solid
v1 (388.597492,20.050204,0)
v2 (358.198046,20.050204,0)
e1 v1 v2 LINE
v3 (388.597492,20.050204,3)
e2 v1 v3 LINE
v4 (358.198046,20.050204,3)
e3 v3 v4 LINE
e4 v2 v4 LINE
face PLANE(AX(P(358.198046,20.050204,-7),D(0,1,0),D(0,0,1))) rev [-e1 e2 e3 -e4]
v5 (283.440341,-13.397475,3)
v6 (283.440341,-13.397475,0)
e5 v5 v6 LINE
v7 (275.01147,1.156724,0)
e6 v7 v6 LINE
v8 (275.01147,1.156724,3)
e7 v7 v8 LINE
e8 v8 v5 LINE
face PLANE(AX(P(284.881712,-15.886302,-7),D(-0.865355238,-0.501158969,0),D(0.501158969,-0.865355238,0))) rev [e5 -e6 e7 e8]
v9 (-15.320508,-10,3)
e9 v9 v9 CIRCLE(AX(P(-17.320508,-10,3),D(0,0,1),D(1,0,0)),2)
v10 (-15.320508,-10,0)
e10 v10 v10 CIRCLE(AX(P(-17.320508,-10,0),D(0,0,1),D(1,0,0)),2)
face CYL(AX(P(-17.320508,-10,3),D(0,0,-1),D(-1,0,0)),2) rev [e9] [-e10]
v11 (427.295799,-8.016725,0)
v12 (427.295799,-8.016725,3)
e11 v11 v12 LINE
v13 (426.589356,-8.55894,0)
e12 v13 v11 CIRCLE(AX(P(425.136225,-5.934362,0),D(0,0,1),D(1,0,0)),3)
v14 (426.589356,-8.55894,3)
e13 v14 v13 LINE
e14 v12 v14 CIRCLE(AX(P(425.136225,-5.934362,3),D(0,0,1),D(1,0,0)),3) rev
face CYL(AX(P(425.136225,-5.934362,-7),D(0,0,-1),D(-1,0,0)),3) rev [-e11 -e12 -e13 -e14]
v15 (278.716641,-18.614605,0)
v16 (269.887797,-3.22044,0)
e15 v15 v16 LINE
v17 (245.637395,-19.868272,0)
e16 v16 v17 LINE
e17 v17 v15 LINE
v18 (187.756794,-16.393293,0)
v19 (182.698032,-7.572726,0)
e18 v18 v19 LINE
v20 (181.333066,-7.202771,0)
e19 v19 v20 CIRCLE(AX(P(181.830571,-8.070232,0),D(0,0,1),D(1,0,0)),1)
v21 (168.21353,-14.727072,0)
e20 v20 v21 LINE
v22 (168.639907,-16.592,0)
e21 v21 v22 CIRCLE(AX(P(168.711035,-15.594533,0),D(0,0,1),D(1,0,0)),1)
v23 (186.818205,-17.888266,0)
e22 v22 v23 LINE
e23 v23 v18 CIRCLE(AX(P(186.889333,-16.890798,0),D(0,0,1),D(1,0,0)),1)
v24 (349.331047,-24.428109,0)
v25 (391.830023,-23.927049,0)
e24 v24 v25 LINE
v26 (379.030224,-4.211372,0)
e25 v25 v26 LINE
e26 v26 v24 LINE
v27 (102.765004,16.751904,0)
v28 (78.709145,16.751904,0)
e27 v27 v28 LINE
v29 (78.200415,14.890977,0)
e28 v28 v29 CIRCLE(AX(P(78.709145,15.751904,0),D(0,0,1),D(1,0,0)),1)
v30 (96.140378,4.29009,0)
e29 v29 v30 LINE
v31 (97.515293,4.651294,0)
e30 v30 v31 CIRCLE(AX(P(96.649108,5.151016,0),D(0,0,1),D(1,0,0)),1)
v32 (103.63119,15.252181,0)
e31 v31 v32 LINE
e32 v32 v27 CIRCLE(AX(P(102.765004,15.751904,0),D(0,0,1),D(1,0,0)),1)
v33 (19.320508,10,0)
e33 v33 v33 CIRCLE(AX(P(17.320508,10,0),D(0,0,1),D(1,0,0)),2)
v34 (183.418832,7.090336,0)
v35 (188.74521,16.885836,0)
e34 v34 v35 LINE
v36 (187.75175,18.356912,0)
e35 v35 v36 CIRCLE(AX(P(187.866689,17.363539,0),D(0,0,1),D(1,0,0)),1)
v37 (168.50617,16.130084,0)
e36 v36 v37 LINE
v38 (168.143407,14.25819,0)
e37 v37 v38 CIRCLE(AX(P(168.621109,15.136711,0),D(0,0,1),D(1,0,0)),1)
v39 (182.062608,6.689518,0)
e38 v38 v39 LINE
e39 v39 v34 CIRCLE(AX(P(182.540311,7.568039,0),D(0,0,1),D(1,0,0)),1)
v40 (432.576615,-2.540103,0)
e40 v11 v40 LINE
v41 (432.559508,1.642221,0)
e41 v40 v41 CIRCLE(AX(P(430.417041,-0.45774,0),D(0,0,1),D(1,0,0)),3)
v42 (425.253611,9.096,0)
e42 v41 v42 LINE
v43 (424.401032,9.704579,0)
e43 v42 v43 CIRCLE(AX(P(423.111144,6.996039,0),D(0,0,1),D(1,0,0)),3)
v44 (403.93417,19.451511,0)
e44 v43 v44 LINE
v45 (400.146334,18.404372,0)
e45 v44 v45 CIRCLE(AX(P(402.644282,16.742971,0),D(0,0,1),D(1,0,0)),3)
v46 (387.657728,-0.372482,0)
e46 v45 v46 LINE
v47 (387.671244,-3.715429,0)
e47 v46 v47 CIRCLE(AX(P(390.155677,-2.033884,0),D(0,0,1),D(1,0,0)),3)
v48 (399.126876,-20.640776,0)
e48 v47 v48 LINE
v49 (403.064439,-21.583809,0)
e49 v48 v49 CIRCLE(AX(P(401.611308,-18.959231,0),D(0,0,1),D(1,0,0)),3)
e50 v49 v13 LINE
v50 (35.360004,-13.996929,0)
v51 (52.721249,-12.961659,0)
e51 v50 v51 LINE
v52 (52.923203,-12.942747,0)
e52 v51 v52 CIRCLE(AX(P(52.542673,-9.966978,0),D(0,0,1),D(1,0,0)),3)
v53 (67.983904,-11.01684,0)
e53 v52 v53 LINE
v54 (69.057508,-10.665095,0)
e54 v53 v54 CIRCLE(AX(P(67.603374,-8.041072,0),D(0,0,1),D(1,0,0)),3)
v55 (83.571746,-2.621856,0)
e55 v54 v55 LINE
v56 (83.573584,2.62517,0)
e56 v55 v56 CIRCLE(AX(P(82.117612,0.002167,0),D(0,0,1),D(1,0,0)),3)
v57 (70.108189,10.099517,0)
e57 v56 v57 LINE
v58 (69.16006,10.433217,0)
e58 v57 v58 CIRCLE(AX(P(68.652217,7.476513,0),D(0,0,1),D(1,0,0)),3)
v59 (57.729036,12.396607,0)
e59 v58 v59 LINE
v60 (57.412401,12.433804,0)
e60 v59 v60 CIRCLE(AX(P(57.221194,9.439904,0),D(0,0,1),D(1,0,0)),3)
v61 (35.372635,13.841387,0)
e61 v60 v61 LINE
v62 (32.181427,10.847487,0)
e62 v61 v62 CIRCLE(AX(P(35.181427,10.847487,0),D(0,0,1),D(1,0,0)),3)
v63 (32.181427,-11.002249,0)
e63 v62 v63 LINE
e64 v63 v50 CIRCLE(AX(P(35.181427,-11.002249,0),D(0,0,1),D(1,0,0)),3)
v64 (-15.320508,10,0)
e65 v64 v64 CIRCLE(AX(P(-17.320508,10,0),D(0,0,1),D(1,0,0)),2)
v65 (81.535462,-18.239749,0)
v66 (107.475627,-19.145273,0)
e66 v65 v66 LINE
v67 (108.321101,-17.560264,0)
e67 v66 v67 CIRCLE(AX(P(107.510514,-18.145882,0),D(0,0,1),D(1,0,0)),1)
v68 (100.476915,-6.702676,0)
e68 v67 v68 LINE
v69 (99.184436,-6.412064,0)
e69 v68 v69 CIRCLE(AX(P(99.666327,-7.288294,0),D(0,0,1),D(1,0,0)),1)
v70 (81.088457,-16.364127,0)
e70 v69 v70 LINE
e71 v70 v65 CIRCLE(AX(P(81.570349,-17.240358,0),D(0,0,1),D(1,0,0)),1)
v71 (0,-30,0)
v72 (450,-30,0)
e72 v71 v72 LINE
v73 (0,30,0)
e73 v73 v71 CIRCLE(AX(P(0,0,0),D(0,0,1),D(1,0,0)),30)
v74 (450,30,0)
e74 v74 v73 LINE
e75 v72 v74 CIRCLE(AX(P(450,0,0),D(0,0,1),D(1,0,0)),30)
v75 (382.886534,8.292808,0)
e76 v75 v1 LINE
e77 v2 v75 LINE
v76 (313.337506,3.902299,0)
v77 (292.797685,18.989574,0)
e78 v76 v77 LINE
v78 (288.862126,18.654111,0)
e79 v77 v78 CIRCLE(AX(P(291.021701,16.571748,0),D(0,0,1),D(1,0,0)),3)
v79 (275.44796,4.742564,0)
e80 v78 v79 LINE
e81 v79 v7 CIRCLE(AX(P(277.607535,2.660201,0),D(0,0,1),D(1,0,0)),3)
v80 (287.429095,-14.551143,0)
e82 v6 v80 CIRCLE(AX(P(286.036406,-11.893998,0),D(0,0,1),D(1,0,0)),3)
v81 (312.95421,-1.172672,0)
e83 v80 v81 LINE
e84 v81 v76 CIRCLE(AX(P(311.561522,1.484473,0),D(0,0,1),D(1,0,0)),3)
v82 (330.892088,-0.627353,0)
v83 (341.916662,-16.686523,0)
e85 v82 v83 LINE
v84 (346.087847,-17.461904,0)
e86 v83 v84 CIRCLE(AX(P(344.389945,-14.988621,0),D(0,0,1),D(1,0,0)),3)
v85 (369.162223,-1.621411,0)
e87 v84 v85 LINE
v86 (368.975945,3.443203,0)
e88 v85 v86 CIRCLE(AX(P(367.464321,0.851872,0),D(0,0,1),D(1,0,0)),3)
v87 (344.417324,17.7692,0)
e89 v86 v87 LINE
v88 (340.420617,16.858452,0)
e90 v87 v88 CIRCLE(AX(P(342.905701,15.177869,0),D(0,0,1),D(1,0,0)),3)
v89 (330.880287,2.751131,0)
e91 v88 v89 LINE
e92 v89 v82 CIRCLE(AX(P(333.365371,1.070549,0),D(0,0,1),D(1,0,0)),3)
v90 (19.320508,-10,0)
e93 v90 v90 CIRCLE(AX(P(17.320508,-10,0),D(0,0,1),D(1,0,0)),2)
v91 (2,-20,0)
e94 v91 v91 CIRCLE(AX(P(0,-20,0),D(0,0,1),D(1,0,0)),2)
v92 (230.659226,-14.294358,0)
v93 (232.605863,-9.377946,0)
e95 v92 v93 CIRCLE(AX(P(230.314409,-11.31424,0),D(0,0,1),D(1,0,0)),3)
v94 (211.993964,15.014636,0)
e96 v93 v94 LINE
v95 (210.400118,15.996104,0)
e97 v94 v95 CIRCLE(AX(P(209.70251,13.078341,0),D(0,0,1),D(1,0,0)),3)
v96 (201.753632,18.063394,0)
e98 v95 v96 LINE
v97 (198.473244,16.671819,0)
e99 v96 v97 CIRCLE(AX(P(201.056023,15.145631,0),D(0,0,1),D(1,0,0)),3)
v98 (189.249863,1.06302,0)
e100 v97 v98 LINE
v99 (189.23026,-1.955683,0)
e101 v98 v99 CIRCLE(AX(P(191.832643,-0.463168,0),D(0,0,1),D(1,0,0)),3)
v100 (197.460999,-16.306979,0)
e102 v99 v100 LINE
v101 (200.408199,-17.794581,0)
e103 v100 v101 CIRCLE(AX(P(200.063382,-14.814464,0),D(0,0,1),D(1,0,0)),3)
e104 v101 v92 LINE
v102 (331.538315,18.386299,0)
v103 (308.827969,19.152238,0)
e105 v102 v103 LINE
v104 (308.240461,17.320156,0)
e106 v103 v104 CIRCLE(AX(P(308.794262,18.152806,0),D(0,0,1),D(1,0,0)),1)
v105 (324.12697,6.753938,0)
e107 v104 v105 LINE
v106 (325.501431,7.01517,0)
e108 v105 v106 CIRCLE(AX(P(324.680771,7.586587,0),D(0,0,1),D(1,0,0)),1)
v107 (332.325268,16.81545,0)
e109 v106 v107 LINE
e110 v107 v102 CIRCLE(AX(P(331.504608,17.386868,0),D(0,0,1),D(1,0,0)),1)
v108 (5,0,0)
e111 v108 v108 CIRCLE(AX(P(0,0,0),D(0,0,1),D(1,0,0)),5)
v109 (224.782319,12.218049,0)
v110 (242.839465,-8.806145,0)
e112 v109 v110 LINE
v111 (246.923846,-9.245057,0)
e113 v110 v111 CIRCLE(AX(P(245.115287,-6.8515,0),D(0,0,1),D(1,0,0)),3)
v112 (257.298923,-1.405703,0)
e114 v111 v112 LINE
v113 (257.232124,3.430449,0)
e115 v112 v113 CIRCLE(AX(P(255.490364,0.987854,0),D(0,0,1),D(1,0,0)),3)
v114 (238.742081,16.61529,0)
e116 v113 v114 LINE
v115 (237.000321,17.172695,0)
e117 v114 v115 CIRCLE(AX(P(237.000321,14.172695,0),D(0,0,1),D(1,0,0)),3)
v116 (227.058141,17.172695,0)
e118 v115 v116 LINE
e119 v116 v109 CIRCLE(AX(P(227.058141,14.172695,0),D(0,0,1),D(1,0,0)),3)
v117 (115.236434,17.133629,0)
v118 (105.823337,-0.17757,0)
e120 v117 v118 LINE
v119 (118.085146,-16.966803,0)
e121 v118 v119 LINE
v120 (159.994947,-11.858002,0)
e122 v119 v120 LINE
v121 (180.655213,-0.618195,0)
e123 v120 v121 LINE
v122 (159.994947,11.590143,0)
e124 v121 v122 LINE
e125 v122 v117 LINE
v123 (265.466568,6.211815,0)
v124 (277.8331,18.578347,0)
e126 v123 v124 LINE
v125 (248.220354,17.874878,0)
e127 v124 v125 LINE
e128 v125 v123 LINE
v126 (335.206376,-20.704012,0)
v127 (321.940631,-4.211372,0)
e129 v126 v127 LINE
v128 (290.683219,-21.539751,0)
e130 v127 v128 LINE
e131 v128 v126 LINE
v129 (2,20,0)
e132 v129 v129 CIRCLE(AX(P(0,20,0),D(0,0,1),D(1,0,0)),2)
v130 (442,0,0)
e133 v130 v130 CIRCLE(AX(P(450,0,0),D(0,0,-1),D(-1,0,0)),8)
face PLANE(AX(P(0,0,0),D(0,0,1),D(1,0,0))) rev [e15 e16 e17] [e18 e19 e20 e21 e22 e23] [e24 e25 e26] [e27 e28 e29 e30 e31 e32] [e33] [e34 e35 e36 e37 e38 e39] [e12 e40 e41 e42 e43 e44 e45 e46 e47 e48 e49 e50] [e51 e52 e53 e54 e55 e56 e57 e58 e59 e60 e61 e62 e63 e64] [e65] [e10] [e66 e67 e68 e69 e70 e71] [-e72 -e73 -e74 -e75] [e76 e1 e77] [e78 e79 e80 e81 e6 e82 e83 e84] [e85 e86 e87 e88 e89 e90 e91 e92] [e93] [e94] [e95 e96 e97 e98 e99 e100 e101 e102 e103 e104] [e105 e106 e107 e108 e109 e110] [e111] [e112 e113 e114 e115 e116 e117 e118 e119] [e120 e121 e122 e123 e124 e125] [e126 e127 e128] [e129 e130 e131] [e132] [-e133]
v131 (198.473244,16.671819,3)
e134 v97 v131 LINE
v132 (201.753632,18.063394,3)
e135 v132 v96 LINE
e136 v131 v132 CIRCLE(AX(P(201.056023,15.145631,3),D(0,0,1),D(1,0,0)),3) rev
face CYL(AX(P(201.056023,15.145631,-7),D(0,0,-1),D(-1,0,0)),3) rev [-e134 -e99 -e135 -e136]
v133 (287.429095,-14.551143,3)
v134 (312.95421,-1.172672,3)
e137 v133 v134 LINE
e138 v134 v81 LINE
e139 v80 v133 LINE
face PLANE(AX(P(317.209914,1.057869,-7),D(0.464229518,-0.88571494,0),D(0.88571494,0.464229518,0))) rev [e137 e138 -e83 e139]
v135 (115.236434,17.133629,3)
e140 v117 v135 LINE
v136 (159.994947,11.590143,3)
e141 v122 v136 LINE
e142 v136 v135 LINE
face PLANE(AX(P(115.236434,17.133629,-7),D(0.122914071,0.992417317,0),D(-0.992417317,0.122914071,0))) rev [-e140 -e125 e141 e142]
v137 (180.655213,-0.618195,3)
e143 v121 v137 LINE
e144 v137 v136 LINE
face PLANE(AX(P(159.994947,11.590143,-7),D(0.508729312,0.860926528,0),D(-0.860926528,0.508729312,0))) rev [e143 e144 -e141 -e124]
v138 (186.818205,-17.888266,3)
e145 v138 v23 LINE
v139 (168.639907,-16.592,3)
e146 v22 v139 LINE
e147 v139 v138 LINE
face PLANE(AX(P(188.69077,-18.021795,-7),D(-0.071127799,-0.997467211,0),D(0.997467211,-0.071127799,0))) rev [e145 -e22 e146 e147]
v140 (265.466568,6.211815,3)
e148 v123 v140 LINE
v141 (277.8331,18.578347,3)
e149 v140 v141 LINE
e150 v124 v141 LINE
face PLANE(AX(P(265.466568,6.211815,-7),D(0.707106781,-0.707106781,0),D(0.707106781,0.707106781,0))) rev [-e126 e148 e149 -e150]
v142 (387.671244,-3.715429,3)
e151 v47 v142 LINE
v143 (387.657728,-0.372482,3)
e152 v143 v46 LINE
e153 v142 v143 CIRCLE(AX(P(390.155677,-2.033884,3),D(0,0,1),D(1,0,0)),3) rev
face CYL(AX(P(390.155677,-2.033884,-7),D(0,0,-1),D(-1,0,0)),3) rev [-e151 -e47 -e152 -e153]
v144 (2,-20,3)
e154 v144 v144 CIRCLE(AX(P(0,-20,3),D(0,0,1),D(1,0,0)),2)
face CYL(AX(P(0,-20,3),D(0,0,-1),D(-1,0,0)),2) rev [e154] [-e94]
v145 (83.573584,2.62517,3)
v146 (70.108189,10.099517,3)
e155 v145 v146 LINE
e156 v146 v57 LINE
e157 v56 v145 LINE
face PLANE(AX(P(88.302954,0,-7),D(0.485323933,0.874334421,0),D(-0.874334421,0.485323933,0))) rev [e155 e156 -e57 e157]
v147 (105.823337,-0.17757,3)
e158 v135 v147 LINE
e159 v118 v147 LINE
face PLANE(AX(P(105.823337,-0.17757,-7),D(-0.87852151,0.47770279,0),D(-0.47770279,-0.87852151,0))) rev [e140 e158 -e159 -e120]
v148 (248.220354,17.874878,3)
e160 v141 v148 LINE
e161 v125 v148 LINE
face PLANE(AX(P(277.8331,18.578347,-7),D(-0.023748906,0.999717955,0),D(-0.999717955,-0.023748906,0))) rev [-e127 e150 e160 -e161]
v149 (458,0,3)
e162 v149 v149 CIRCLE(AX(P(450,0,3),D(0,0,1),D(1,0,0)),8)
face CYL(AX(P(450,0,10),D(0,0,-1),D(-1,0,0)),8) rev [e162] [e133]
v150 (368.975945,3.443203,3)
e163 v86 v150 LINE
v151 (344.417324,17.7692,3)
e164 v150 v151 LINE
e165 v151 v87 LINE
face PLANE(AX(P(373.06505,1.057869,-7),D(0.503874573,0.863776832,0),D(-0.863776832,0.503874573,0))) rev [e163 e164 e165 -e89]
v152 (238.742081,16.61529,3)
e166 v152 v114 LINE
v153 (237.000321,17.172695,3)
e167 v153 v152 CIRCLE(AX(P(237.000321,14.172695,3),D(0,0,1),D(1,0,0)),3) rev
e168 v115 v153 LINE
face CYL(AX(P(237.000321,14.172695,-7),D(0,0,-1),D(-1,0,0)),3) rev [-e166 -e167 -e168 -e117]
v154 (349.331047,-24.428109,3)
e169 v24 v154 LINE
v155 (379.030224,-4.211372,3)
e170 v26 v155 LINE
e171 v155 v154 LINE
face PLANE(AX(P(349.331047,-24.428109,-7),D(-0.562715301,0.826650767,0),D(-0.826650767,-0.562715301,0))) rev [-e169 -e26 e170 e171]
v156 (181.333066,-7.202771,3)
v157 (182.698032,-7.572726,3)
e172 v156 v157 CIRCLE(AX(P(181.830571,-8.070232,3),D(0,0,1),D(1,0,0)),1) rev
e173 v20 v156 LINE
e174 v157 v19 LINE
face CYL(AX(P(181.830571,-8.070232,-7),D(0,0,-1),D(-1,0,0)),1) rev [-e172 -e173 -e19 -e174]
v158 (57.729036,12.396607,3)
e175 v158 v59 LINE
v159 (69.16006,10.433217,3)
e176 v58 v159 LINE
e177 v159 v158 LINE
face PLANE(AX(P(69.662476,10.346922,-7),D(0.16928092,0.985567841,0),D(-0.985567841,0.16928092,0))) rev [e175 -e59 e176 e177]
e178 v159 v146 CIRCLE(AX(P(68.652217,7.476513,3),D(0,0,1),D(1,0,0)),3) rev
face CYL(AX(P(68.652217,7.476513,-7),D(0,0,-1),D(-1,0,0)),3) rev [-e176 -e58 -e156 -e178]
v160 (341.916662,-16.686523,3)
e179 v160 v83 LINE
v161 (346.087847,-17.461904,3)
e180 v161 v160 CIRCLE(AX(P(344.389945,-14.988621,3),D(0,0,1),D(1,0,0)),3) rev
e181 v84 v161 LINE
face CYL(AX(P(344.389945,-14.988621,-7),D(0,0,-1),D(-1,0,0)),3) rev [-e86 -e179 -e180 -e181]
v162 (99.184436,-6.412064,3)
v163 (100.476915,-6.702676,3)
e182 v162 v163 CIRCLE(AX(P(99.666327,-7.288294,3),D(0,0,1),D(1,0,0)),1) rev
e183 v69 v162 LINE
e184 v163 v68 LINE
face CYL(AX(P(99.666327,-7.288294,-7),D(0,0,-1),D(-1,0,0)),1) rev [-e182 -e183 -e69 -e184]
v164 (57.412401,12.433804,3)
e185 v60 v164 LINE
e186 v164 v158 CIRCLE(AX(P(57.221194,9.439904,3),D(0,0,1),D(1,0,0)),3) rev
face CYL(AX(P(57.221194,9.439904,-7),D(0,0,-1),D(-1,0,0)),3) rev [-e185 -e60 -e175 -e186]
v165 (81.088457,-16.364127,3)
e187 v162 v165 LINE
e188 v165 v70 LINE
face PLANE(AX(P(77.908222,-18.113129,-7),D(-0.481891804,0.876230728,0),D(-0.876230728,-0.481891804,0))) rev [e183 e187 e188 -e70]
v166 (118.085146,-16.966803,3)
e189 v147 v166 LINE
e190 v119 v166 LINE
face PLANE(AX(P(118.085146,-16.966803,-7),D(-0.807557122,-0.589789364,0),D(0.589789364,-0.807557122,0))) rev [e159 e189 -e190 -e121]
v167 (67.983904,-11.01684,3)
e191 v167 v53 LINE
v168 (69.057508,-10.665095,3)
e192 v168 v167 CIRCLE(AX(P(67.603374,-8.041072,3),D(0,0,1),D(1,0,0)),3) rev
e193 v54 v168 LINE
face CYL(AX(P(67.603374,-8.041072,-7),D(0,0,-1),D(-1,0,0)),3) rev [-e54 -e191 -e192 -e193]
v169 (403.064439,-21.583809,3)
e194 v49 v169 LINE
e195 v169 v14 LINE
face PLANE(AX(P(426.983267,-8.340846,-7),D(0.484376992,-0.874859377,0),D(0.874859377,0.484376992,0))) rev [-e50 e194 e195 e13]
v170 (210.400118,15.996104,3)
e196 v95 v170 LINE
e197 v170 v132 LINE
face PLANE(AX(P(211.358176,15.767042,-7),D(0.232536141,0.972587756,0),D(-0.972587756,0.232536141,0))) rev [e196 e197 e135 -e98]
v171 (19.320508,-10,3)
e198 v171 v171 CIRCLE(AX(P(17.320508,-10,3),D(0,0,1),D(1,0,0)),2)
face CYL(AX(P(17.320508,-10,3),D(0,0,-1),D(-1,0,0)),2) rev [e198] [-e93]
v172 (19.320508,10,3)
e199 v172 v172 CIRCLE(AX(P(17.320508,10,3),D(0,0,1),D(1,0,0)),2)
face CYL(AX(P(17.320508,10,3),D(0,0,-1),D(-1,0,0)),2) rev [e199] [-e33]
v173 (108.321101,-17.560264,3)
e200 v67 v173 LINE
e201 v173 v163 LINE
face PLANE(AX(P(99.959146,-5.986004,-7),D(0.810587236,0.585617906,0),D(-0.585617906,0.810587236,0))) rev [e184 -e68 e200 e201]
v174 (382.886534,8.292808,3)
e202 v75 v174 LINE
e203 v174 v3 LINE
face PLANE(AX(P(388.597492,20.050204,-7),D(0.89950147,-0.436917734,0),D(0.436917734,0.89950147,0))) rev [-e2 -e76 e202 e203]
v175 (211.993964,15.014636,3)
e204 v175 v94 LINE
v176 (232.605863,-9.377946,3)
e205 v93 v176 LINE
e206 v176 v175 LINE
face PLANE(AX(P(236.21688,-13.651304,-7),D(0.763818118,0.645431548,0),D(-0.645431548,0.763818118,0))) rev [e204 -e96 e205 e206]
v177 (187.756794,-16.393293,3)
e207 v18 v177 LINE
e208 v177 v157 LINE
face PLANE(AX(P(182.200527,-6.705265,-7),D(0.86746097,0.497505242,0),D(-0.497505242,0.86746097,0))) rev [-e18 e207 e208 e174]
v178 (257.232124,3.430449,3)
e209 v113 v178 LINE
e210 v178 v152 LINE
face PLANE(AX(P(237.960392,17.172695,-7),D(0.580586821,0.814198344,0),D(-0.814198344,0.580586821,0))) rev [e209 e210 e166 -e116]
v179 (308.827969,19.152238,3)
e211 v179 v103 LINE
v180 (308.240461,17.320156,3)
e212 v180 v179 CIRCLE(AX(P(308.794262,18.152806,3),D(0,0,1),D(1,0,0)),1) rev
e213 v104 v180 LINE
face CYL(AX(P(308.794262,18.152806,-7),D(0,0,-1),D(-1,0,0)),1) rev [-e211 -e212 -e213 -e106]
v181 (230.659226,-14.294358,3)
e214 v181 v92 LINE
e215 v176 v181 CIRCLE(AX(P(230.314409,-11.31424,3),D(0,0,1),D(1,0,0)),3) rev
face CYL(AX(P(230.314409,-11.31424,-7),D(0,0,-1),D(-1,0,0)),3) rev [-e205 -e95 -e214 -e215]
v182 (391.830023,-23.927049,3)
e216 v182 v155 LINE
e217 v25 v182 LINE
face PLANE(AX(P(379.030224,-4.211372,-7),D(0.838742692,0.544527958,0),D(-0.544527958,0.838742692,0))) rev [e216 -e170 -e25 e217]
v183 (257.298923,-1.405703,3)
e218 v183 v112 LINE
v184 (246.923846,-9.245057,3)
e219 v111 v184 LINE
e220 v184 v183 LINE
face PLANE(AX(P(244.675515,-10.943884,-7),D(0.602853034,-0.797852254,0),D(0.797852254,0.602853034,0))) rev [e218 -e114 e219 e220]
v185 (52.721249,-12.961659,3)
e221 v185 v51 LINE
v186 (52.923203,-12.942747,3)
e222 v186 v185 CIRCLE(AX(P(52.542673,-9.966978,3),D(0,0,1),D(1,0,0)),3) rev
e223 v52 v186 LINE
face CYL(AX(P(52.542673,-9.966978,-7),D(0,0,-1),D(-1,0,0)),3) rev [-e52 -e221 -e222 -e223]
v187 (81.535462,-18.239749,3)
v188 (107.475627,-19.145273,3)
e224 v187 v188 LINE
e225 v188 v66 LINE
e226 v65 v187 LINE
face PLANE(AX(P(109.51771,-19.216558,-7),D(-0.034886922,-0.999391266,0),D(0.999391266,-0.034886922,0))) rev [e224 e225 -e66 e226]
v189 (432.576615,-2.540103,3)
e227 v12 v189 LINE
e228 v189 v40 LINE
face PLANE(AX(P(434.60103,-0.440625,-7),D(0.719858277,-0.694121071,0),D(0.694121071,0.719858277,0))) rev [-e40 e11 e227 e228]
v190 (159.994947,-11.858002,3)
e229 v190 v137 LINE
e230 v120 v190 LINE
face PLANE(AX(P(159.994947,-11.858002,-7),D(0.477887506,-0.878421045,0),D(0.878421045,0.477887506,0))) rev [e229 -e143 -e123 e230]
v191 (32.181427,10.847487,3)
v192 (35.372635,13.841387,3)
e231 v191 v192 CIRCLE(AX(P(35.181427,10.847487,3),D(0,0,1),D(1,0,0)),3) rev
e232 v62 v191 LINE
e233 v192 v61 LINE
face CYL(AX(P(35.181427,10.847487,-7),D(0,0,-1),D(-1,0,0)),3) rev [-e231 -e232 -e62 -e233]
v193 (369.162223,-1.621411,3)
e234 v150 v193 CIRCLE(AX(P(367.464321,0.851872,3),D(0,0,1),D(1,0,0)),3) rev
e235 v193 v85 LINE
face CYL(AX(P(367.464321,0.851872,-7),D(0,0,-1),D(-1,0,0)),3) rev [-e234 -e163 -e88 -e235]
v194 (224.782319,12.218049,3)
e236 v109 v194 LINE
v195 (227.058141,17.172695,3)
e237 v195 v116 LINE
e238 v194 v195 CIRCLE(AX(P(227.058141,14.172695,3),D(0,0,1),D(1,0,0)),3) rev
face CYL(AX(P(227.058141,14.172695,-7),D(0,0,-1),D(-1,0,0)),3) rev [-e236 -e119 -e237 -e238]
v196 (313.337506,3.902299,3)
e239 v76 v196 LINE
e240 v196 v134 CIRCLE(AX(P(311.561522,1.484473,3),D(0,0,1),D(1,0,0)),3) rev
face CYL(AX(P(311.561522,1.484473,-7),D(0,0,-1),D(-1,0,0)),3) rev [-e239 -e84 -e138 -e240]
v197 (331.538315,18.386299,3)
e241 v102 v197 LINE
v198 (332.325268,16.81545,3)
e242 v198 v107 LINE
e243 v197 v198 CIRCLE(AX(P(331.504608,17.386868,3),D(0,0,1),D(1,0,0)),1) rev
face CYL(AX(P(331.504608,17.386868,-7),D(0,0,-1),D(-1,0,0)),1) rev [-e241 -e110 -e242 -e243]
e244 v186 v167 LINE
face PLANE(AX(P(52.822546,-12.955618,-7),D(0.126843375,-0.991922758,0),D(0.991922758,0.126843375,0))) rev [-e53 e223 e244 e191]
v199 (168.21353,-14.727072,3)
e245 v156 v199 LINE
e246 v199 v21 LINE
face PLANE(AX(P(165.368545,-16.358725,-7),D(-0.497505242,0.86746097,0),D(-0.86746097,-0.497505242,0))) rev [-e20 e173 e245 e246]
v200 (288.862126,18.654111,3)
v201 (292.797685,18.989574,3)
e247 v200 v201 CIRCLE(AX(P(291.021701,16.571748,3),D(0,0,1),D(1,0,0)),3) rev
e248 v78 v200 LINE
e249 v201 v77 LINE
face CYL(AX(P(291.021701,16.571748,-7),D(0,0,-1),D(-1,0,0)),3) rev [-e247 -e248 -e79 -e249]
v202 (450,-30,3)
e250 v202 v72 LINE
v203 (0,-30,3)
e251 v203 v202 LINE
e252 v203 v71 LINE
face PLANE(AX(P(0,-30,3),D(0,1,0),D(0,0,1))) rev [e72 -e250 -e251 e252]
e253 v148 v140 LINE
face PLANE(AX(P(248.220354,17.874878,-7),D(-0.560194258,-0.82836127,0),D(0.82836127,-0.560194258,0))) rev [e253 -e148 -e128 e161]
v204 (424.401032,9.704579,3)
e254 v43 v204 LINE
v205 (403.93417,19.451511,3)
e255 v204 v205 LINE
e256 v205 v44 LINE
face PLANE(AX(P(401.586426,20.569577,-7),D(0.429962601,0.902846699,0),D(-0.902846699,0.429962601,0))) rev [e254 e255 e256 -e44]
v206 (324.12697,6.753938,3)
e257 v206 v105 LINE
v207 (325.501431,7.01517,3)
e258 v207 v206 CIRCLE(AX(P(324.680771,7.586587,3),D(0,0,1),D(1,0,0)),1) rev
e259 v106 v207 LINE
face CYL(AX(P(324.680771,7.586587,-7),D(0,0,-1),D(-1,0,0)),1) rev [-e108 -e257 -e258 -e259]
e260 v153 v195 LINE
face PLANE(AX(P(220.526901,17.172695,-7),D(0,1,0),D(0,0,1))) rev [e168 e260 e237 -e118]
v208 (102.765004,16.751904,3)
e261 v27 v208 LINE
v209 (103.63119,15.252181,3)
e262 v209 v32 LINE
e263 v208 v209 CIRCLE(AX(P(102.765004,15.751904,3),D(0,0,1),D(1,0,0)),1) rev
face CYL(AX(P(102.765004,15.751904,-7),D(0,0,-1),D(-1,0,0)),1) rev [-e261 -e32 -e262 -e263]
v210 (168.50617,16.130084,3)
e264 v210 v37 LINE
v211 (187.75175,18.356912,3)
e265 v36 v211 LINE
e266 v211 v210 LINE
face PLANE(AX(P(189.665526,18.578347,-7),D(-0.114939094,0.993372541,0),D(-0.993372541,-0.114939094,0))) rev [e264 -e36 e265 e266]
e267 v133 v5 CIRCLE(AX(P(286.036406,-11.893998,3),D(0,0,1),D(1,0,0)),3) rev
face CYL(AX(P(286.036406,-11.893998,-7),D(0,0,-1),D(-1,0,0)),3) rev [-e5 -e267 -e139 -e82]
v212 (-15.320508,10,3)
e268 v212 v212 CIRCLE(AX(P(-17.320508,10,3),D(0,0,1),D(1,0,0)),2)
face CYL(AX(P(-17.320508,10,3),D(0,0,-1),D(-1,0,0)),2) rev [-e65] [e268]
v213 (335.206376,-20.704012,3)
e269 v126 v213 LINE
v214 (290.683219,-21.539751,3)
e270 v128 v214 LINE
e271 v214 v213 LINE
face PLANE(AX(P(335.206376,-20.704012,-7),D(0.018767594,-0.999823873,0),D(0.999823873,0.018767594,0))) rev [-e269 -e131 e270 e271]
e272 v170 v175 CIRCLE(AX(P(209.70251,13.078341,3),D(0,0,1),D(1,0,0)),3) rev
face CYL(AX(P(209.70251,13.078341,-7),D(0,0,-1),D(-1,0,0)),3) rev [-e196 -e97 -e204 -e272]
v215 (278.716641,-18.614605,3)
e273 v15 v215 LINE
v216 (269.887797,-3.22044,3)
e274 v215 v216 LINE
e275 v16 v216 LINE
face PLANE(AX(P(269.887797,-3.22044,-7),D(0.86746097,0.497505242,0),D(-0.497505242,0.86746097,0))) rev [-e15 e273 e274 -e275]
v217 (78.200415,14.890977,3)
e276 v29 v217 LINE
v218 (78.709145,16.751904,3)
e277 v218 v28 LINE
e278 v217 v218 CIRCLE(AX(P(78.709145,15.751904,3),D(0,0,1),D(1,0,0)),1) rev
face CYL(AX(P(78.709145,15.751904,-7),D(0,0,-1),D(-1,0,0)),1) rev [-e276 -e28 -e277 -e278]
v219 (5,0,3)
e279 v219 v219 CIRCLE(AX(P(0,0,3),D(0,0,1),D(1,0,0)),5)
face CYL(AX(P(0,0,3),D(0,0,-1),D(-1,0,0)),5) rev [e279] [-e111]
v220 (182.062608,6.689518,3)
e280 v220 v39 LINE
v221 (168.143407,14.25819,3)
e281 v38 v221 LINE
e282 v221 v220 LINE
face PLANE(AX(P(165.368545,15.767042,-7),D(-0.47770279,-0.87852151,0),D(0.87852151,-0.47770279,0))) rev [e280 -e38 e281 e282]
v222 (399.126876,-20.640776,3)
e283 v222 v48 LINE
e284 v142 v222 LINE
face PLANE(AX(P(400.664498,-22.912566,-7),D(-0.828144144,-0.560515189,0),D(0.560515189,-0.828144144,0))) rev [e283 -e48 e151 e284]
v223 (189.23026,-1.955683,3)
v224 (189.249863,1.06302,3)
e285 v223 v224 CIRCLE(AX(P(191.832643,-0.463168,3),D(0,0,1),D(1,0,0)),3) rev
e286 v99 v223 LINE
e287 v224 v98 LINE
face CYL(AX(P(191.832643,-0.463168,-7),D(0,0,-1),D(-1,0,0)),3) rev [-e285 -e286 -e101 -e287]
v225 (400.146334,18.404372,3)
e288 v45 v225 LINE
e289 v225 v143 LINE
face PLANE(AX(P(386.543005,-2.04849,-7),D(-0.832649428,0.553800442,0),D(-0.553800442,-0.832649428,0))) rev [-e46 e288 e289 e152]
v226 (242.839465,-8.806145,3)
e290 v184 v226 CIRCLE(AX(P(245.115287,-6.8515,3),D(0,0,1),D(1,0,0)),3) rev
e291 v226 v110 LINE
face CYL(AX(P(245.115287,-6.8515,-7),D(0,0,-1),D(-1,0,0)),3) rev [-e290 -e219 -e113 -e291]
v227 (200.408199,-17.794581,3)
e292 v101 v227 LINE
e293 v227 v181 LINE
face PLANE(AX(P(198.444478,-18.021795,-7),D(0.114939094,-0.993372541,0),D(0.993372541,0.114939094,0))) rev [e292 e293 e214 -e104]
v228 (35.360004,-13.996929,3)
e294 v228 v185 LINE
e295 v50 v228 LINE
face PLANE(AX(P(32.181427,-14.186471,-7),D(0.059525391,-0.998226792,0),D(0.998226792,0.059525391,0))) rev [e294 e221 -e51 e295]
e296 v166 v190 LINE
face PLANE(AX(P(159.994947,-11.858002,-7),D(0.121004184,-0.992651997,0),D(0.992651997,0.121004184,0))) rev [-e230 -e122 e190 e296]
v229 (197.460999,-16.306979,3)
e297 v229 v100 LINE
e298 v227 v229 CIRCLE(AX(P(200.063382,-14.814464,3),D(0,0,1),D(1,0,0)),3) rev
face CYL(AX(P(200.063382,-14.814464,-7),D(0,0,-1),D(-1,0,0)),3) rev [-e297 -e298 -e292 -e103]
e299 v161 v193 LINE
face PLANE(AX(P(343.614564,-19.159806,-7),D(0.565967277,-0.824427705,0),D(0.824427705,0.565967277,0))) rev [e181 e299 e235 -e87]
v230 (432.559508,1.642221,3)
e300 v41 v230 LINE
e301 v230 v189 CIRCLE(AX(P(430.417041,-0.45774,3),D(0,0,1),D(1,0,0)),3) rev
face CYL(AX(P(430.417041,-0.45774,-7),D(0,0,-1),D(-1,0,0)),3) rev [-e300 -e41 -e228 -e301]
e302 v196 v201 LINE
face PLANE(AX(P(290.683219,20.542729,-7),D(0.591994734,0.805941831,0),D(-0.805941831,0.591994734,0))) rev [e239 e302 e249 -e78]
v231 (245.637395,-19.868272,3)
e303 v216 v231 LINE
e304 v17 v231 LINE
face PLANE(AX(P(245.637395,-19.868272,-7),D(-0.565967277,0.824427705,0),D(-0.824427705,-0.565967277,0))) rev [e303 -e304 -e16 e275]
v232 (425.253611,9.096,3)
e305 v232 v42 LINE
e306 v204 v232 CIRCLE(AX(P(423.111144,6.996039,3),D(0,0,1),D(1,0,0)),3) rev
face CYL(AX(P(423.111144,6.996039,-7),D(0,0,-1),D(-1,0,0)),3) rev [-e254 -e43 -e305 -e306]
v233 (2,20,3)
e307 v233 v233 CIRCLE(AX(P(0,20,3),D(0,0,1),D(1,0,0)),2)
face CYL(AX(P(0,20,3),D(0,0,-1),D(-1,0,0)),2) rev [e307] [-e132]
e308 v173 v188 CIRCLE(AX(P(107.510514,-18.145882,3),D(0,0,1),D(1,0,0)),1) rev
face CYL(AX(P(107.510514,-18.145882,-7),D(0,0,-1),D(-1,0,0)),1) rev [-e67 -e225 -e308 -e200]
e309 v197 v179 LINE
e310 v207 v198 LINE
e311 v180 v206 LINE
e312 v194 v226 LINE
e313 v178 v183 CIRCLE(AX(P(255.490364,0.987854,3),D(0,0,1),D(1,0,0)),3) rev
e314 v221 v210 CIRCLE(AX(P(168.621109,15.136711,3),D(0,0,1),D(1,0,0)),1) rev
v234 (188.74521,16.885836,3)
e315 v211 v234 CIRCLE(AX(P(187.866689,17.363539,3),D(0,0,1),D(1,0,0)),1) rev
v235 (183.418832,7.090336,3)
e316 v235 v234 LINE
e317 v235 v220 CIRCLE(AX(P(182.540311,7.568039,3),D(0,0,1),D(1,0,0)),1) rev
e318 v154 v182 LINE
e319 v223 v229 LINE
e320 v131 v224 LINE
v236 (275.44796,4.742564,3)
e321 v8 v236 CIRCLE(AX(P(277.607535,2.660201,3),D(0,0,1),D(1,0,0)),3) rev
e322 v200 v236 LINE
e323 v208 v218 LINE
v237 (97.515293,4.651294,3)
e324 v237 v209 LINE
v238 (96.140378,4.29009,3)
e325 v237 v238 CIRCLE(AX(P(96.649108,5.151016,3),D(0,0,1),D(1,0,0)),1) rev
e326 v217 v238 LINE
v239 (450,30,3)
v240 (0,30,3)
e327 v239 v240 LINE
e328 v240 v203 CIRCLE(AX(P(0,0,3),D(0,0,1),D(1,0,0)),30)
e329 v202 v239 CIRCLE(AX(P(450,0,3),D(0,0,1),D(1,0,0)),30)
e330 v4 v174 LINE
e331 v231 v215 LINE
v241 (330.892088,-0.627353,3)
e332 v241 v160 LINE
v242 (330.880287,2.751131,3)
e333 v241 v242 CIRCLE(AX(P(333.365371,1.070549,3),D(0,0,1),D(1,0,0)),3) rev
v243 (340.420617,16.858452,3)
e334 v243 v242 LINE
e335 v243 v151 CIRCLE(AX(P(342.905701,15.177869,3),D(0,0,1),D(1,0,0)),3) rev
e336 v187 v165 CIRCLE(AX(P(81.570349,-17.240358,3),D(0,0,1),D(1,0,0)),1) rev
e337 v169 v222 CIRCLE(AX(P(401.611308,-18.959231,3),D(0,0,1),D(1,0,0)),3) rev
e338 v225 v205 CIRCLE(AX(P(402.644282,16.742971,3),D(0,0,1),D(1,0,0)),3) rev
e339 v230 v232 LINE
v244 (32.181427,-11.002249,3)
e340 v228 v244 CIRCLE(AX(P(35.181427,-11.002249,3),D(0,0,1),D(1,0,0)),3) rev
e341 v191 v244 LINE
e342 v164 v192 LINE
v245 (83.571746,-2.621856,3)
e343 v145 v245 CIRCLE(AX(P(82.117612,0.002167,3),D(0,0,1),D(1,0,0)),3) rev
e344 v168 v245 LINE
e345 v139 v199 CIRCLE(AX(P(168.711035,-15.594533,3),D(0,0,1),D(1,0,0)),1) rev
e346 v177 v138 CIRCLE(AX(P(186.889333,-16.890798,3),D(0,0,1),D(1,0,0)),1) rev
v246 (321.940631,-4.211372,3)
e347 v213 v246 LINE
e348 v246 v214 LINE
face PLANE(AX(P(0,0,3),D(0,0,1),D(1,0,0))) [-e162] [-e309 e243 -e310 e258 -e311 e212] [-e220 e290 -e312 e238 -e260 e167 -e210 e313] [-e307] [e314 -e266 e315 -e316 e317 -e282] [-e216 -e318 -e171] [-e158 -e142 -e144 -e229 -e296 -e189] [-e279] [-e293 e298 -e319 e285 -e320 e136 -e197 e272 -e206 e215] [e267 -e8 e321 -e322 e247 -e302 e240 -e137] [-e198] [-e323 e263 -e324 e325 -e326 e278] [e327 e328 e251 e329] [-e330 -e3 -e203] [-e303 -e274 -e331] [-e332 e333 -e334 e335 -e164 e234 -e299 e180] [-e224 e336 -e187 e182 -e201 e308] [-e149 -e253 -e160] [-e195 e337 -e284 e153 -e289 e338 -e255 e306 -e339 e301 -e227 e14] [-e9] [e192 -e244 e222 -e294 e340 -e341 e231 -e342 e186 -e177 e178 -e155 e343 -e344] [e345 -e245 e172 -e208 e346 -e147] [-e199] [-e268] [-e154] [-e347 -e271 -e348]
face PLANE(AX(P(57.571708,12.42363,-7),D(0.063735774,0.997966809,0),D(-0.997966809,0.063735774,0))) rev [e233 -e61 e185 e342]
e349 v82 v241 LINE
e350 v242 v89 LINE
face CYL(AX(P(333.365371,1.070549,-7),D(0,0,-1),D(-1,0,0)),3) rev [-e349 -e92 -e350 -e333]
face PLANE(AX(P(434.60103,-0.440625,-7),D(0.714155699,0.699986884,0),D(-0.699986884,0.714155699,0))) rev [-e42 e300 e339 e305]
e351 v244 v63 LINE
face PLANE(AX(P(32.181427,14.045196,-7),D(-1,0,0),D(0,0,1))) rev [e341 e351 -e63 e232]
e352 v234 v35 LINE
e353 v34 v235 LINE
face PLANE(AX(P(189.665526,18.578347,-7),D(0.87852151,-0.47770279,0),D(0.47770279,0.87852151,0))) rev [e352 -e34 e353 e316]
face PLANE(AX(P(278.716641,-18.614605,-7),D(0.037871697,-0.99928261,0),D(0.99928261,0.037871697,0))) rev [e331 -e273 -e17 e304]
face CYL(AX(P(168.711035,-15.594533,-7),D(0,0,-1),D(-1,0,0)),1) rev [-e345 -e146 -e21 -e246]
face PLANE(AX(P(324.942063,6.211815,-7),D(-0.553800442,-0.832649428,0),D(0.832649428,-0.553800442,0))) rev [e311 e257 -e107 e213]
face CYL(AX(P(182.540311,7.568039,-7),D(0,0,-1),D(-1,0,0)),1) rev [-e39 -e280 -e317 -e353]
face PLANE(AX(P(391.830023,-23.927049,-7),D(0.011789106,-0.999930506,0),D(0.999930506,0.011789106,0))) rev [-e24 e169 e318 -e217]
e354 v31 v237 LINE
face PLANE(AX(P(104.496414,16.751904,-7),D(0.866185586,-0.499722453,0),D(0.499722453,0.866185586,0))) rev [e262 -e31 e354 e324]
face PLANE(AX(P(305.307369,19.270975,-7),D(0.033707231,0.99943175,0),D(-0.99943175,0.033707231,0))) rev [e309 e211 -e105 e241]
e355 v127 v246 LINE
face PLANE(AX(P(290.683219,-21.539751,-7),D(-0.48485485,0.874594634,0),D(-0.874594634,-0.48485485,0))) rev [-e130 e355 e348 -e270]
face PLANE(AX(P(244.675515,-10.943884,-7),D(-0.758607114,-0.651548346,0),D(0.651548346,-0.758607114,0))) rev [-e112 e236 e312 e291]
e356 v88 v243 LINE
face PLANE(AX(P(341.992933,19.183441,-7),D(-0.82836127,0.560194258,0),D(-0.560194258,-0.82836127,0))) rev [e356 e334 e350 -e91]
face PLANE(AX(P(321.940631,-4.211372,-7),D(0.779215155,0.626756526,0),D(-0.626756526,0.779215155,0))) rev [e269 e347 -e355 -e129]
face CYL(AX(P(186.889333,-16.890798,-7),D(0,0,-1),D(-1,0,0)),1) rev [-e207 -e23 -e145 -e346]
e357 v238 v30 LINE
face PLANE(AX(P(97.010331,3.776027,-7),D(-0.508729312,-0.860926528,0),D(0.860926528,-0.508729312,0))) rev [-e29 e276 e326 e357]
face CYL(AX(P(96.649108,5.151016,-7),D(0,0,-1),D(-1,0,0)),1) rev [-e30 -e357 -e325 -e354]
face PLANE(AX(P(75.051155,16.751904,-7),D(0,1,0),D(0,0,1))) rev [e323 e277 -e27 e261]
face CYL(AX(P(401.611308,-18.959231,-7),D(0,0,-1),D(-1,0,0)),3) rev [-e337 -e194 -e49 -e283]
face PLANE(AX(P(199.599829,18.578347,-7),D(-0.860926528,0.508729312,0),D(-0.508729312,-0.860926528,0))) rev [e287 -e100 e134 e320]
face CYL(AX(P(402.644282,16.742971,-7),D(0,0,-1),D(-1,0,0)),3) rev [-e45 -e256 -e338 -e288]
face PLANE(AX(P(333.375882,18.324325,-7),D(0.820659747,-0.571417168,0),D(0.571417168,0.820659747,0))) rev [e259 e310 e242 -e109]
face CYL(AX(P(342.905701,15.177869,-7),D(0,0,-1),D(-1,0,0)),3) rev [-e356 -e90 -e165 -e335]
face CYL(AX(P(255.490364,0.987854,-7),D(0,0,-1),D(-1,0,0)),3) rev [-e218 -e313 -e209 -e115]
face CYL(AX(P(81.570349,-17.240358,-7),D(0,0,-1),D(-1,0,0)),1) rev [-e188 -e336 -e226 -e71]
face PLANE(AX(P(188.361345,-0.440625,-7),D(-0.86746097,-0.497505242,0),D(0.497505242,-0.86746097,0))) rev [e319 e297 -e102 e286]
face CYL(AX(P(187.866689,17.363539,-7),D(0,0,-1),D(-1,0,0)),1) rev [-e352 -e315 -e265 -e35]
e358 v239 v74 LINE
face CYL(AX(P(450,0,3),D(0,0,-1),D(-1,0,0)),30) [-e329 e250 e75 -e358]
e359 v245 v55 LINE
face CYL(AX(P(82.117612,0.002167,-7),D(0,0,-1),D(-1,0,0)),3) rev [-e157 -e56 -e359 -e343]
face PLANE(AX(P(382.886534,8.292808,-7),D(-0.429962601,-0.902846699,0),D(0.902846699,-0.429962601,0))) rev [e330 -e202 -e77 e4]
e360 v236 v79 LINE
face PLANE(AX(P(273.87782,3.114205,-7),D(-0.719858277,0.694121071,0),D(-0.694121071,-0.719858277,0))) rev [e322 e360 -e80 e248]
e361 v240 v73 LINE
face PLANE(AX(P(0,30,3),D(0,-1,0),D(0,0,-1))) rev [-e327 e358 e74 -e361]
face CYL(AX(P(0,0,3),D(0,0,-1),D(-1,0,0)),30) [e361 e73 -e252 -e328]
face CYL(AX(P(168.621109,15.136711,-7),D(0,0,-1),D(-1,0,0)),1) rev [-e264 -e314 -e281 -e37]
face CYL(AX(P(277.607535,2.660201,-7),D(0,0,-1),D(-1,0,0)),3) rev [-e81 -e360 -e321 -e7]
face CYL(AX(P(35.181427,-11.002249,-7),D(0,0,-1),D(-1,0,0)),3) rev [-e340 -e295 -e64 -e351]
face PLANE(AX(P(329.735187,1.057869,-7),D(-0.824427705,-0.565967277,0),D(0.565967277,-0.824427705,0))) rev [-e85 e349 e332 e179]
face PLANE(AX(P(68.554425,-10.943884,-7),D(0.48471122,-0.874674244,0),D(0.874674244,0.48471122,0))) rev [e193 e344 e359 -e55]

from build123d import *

# Parameters (mm, degrees)
SKETCH1_R           = 2
SKETCH1_R_2         = 5
BOSS_EXTRUDE1_DEPTH = 3
SKETCH2_R           = 8
CUT_EXTRUDE1_DEPTH  = 10
CUT_EXTRUDE2_DEPTH  = 10
FILLET1_R           = 3
FILLET2_R           = 1
FILLET3_R           = 3


with BuildPart() as part:
    # Sketch1 → Boss-Extrude1 (new body)
    with BuildSketch(Plane.XY):
        with BuildLine():
            Line((0, 30), (450, 30))
            ThreePointArc((450, 30), (480, 0), (450, -30))
            Line((450, -30), (0, -30))
            ThreePointArc((0, -30), (-30, 0), (0, 30))
        make_face()
        with Locations((0, 20)):
            Circle(SKETCH1_R, mode=Mode.SUBTRACT)
        with Locations((17.320508076, 10)):
            Circle(SKETCH1_R, mode=Mode.SUBTRACT)
        with Locations((17.320508076, -10)):
            Circle(SKETCH1_R, mode=Mode.SUBTRACT)
        with Locations((0, -20)):
            Circle(SKETCH1_R, mode=Mode.SUBTRACT)
        Circle(SKETCH1_R_2, mode=Mode.SUBTRACT)
        with Locations((-17.320508076, -10)):
            Circle(SKETCH1_R, mode=Mode.SUBTRACT)
        with Locations((-17.320508076, 10)):
            Circle(SKETCH1_R, mode=Mode.SUBTRACT)
    extrude(amount=BOSS_EXTRUDE1_DEPTH)

    # Sketch2 → Cut-Extrude1 (cut)
    with BuildSketch(Plane(origin=(0, 0, 0), x_dir=(-1, 0, 0), z_dir=(0, 0, -1))):
        with Locations((-450, 0)):
            Circle(SKETCH2_R)
    extrude(amount=-CUT_EXTRUDE1_DEPTH, mode=Mode.SUBTRACT)

    # Sketch4 → Cut-Extrude2 (cut)
    with BuildSketch(Plane.XY.offset(3)):
        Polygon((75.051155, 16.751903708), (104.496414244, 16.751903708), (97.010331386, 3.776026753), align=None)
        Polygon((115.236434087, 17.133628969), (159.994947493, 11.590143364), (180.655213039, -0.618195368), (159.994947493, -11.858002091), (118.085145684, -16.966802955), (105.823337098, -0.177570288), align=None)
        Polygon((189.665526052, 18.578346929), (182.941129647, 6.211814834), (165.368544986, 15.767042135), align=None)
        Polygon((199.599828734, 18.578346929), (188.361345274, -0.440625079), (198.44447832, -18.021795356), (236.21688029, -13.651304452), (211.35817569, 15.767042135), align=None)
        Polygon((220.526900823, 17.172694532), (237.960392272, 17.172694532), (260.559362669, 1.057868841), (244.675514904, -10.943884315), align=None)
        Polygon((265.46656767, 6.211814834), (277.833099766, 18.578346929), (248.220353812, 17.874878196), align=None)
        Polygon((165.368544986, -16.358724589), (182.200526719, -6.705265316), (188.690770328, -18.021795356), align=None)
        Polygon((245.637394842, -19.868271823), (269.887796501, -3.220439984), (278.716640894, -18.61460526), align=None)
        Polygon((290.68321902, -21.539751298), (321.940631216, -4.211371592), (335.206376445, -20.70401156), align=None)
        Polygon((341.992933025, 19.183441398), (329.735187473, 1.057868841), (343.614563911, -19.159806148), (373.065049946, 1.057868841), align=None)
        Polygon((273.877820417, 3.11420529), (290.68321902, 20.542728609), (317.209913689, 1.057868841), (284.881711611, -15.886302486), align=None)
        Polygon((305.30736893, 19.270974689), (333.375882047, 18.324324896), (324.94206251, 6.211814834), align=None)
        Polygon((358.198045962, 20.050204211), (388.597492455, 20.050204211), (382.886534474, 8.292807575), align=None)
        Polygon((349.331047186, -24.428108969), (379.030224427, -4.211371592), (391.830023208, -23.92704923), align=None)
        Polygon((386.543005003, -2.048490112), (401.586425759, 20.569577221), (424.881274354, 9.475873595), (434.601030173, -0.440625079), (426.98326683, -8.340846264), (400.664497987, -22.912566492), align=None)
        Polygon((77.908222084, -18.113128875), (99.959146412, -5.986003719), (109.517710051, -19.216558315), align=None)
        Polygon((32.181427401, 14.045195837), (32.181427401, -14.186471438), (52.8225456, -12.955618238), (68.554424875, -10.943884315), (88.302954178, 0), (69.662476286, 10.346921974), (57.571708379, 12.423629667), align=None)
    extrude(amount=-CUT_EXTRUDE2_DEPTH, mode=Mode.SUBTRACT)

    # Fillet1
    # the kernel refuses this fillet: 3 mm, written as the material it adds along each edge
    with BuildSketch(Plane(origin=(32.181427401, 14.045195837, 3), x_dir=(0, -1, 0), z_dir=(0, 0, -1))) as fillet1_piece_1:
        with BuildLine():
            CenterArc((FILLET1_R * 1.06590295895, -FILLET1_R), FILLET1_R, 90, 93.654267812)
            Line((FILLET1_R * 0.0679361503378, -FILLET1_R * 1.06373577423), (0, 0))
            Line((0, 0), (FILLET1_R * 1.06590295895, 0))
        make_face()
    extrude(amount=3)
    with BuildSketch(Plane(origin=(57.571708379, 12.423629667, 3), x_dir=(-0.9979668086083109, 0.06373577422564991, 0), z_dir=(0, 0, -1))) as fillet1_piece_2:
        with BuildLine():
            CenterArc((FILLET1_R * 0.0532106389046, -FILLET1_R), FILLET1_R, 90, 6.091745071)
            Line((-FILLET1_R * 0.0529101714038, -FILLET1_R * 0.00564675611758), (0, 0))
            Line((0, 0), (FILLET1_R * 0.0532106389046, 0))
        make_face()
    extrude(amount=3)
    with BuildSketch(Plane(origin=(69.662476286, 10.346921974, 3), x_dir=(-0.9855678414202016, 0.16928092024302194, 0), z_dir=(0, 0, -1))) as fillet1_piece_3:
        with BuildLine():
            CenterArc((FILLET1_R * 0.169924527084, -FILLET1_R), FILLET1_R, 90, 19.287684891)
            Line((-FILLET1_R * 0.160386998178, -FILLET1_R * 0.0561280297205), (0, 0))
            Line((0, 0), (FILLET1_R * 0.169924527084, 0))
        make_face()
    extrude(amount=3)
    with BuildSketch(Plane(origin=(88.302954178, 0, 3), x_dir=(-0.8743344213622383, 0.48532393266885154, 0), z_dir=(0, 0, -1))) as fillet1_piece_4:
        with BuildLine():
            CenterArc((FILLET1_R * 1.80303637433, -FILLET1_R), FILLET1_R, 90, 121.972748141)
            Line((FILLET1_R * 0.954736326134, -FILLET1_R * 1.52951584323), (0, 0))
            Line((0, 0), (FILLET1_R * 1.80303637433, 0))
        make_face()
    extrude(amount=3)
    with BuildSketch(Plane(origin=(68.554424875, -10.943884315, 3), x_dir=(0.8746742438686059, 0.4847112203290558, 0), z_dir=(0, 0, -1))) as fillet1_piece_5:
        with BuildLine():
            CenterArc((FILLET1_R * 0.191722072286, -FILLET1_R), FILLET1_R, 90, 21.70633324)
            Line((-FILLET1_R * 0.178127385219, -FILLET1_R * 0.0709083044269), (0, 0))
            Line((0, 0), (FILLET1_R * 0.191722072286, 0))
        make_face()
    extrude(amount=3)
    with BuildSketch(Plane(origin=(52.8225456, -12.955618238, 3), x_dir=(0.9919227581955331, 0.1268433749699441, 0), z_dir=(0, 0, -1))) as fillet1_piece_6:
        with BuildLine():
            CenterArc((FILLET1_R * 0.0338255904119, -FILLET1_R), FILLET1_R, 90, 3.874649837)
            Line((-FILLET1_R * 0.0337482743847, -FILLET1_R * 0.00228572587316), (0, 0))
            Line((0, 0), (FILLET1_R * 0.0338255904119, 0))
        make_face()
    extrude(amount=3)
    with BuildSketch(Plane(origin=(32.181427401, -14.186471438, 3), x_dir=(0, 1, 0), z_dir=(0, 0, -1))) as fillet1_piece_7:
        with BuildLine():
            CenterArc((FILLET1_R * 1.06140748795, FILLET1_R), FILLET1_R, 176.587428992, 93.412571008)
            Line((FILLET1_R * 0.0631806961919, FILLET1_R * 1.05952539143), (0, 0))
            Line((0, 0), (FILLET1_R * 1.06140748795, 0))
        make_face()
    extrude(amount=3)

    # Fillet2
    fillet2_edges = [part.edges().sort_by_distance(p)[0] for p in [
        (188.690770328, -18.021795356, 1.5),
        (165.368544986, -16.358724589, 1.5),
        (182.200526719, -6.705265316, 1.5),
        (97.010331386, 3.776026753, 1.5),
        (75.051155, 16.751903708, 1.5),
        (104.496414244, 16.751903708, 1.5),
        (165.368544986, 15.767042135, 1.5),
        (189.665526052, 18.578346929, 1.5),
        (182.941129647, 6.211814834, 1.5),
        (109.517710051, -19.216558315, 1.5),
        (77.908222084, -18.113128875, 1.5),
        (99.959146412, -5.986003719, 1.5),
        (324.94206251, 6.211814834, 1.5),
        (305.30736893, 19.270974689, 1.5),
        (333.375882047, 18.324324896, 1.5),
    ]]
    fillet(fillet2_edges, radius=FILLET2_R)

    # Fillet3
    fillet3_edges = [part.edges().sort_by_distance(p)[0] for p in [
        (244.675514904, -10.943884315, 1.5),
        (220.526900823, 17.172694532, 1.5),
        (237.960392272, 17.172694532, 1.5),
        (260.559362669, 1.057868841, 1.5),
        (199.599828734, 18.578346929, 1.5),
        (211.35817569, 15.767042135, 1.5),
        (236.21688029, -13.651304452, 1.5),
        (198.44447832, -18.021795356, 1.5),
        (188.361345274, -0.440625079, 1.5),
        (400.664497987, -22.912566492, 1.5),
        (386.543005003, -2.048490112, 1.5),
        (401.586425759, 20.569577221, 1.5),
        (424.881274354, 9.475873595, 1.5),
        (434.601030173, -0.440625079, 1.5),
        (426.98326683, -8.340846264, 1.5),
        (341.992933025, 19.183441398, 1.5),
        (373.065049946, 1.057868841, 1.5),
        (343.614563911, -19.159806148, 1.5),
        (329.735187473, 1.057868841, 1.5),
        (284.881711611, -15.886302486, 1.5),
        (273.877820417, 3.11420529, 1.5),
        (290.68321902, 20.542728609, 1.5),
        (317.209913689, 1.057868841, 1.5),
    ]]
    fillet(fillet3_edges, radius=FILLET3_R)


solid = part.part
